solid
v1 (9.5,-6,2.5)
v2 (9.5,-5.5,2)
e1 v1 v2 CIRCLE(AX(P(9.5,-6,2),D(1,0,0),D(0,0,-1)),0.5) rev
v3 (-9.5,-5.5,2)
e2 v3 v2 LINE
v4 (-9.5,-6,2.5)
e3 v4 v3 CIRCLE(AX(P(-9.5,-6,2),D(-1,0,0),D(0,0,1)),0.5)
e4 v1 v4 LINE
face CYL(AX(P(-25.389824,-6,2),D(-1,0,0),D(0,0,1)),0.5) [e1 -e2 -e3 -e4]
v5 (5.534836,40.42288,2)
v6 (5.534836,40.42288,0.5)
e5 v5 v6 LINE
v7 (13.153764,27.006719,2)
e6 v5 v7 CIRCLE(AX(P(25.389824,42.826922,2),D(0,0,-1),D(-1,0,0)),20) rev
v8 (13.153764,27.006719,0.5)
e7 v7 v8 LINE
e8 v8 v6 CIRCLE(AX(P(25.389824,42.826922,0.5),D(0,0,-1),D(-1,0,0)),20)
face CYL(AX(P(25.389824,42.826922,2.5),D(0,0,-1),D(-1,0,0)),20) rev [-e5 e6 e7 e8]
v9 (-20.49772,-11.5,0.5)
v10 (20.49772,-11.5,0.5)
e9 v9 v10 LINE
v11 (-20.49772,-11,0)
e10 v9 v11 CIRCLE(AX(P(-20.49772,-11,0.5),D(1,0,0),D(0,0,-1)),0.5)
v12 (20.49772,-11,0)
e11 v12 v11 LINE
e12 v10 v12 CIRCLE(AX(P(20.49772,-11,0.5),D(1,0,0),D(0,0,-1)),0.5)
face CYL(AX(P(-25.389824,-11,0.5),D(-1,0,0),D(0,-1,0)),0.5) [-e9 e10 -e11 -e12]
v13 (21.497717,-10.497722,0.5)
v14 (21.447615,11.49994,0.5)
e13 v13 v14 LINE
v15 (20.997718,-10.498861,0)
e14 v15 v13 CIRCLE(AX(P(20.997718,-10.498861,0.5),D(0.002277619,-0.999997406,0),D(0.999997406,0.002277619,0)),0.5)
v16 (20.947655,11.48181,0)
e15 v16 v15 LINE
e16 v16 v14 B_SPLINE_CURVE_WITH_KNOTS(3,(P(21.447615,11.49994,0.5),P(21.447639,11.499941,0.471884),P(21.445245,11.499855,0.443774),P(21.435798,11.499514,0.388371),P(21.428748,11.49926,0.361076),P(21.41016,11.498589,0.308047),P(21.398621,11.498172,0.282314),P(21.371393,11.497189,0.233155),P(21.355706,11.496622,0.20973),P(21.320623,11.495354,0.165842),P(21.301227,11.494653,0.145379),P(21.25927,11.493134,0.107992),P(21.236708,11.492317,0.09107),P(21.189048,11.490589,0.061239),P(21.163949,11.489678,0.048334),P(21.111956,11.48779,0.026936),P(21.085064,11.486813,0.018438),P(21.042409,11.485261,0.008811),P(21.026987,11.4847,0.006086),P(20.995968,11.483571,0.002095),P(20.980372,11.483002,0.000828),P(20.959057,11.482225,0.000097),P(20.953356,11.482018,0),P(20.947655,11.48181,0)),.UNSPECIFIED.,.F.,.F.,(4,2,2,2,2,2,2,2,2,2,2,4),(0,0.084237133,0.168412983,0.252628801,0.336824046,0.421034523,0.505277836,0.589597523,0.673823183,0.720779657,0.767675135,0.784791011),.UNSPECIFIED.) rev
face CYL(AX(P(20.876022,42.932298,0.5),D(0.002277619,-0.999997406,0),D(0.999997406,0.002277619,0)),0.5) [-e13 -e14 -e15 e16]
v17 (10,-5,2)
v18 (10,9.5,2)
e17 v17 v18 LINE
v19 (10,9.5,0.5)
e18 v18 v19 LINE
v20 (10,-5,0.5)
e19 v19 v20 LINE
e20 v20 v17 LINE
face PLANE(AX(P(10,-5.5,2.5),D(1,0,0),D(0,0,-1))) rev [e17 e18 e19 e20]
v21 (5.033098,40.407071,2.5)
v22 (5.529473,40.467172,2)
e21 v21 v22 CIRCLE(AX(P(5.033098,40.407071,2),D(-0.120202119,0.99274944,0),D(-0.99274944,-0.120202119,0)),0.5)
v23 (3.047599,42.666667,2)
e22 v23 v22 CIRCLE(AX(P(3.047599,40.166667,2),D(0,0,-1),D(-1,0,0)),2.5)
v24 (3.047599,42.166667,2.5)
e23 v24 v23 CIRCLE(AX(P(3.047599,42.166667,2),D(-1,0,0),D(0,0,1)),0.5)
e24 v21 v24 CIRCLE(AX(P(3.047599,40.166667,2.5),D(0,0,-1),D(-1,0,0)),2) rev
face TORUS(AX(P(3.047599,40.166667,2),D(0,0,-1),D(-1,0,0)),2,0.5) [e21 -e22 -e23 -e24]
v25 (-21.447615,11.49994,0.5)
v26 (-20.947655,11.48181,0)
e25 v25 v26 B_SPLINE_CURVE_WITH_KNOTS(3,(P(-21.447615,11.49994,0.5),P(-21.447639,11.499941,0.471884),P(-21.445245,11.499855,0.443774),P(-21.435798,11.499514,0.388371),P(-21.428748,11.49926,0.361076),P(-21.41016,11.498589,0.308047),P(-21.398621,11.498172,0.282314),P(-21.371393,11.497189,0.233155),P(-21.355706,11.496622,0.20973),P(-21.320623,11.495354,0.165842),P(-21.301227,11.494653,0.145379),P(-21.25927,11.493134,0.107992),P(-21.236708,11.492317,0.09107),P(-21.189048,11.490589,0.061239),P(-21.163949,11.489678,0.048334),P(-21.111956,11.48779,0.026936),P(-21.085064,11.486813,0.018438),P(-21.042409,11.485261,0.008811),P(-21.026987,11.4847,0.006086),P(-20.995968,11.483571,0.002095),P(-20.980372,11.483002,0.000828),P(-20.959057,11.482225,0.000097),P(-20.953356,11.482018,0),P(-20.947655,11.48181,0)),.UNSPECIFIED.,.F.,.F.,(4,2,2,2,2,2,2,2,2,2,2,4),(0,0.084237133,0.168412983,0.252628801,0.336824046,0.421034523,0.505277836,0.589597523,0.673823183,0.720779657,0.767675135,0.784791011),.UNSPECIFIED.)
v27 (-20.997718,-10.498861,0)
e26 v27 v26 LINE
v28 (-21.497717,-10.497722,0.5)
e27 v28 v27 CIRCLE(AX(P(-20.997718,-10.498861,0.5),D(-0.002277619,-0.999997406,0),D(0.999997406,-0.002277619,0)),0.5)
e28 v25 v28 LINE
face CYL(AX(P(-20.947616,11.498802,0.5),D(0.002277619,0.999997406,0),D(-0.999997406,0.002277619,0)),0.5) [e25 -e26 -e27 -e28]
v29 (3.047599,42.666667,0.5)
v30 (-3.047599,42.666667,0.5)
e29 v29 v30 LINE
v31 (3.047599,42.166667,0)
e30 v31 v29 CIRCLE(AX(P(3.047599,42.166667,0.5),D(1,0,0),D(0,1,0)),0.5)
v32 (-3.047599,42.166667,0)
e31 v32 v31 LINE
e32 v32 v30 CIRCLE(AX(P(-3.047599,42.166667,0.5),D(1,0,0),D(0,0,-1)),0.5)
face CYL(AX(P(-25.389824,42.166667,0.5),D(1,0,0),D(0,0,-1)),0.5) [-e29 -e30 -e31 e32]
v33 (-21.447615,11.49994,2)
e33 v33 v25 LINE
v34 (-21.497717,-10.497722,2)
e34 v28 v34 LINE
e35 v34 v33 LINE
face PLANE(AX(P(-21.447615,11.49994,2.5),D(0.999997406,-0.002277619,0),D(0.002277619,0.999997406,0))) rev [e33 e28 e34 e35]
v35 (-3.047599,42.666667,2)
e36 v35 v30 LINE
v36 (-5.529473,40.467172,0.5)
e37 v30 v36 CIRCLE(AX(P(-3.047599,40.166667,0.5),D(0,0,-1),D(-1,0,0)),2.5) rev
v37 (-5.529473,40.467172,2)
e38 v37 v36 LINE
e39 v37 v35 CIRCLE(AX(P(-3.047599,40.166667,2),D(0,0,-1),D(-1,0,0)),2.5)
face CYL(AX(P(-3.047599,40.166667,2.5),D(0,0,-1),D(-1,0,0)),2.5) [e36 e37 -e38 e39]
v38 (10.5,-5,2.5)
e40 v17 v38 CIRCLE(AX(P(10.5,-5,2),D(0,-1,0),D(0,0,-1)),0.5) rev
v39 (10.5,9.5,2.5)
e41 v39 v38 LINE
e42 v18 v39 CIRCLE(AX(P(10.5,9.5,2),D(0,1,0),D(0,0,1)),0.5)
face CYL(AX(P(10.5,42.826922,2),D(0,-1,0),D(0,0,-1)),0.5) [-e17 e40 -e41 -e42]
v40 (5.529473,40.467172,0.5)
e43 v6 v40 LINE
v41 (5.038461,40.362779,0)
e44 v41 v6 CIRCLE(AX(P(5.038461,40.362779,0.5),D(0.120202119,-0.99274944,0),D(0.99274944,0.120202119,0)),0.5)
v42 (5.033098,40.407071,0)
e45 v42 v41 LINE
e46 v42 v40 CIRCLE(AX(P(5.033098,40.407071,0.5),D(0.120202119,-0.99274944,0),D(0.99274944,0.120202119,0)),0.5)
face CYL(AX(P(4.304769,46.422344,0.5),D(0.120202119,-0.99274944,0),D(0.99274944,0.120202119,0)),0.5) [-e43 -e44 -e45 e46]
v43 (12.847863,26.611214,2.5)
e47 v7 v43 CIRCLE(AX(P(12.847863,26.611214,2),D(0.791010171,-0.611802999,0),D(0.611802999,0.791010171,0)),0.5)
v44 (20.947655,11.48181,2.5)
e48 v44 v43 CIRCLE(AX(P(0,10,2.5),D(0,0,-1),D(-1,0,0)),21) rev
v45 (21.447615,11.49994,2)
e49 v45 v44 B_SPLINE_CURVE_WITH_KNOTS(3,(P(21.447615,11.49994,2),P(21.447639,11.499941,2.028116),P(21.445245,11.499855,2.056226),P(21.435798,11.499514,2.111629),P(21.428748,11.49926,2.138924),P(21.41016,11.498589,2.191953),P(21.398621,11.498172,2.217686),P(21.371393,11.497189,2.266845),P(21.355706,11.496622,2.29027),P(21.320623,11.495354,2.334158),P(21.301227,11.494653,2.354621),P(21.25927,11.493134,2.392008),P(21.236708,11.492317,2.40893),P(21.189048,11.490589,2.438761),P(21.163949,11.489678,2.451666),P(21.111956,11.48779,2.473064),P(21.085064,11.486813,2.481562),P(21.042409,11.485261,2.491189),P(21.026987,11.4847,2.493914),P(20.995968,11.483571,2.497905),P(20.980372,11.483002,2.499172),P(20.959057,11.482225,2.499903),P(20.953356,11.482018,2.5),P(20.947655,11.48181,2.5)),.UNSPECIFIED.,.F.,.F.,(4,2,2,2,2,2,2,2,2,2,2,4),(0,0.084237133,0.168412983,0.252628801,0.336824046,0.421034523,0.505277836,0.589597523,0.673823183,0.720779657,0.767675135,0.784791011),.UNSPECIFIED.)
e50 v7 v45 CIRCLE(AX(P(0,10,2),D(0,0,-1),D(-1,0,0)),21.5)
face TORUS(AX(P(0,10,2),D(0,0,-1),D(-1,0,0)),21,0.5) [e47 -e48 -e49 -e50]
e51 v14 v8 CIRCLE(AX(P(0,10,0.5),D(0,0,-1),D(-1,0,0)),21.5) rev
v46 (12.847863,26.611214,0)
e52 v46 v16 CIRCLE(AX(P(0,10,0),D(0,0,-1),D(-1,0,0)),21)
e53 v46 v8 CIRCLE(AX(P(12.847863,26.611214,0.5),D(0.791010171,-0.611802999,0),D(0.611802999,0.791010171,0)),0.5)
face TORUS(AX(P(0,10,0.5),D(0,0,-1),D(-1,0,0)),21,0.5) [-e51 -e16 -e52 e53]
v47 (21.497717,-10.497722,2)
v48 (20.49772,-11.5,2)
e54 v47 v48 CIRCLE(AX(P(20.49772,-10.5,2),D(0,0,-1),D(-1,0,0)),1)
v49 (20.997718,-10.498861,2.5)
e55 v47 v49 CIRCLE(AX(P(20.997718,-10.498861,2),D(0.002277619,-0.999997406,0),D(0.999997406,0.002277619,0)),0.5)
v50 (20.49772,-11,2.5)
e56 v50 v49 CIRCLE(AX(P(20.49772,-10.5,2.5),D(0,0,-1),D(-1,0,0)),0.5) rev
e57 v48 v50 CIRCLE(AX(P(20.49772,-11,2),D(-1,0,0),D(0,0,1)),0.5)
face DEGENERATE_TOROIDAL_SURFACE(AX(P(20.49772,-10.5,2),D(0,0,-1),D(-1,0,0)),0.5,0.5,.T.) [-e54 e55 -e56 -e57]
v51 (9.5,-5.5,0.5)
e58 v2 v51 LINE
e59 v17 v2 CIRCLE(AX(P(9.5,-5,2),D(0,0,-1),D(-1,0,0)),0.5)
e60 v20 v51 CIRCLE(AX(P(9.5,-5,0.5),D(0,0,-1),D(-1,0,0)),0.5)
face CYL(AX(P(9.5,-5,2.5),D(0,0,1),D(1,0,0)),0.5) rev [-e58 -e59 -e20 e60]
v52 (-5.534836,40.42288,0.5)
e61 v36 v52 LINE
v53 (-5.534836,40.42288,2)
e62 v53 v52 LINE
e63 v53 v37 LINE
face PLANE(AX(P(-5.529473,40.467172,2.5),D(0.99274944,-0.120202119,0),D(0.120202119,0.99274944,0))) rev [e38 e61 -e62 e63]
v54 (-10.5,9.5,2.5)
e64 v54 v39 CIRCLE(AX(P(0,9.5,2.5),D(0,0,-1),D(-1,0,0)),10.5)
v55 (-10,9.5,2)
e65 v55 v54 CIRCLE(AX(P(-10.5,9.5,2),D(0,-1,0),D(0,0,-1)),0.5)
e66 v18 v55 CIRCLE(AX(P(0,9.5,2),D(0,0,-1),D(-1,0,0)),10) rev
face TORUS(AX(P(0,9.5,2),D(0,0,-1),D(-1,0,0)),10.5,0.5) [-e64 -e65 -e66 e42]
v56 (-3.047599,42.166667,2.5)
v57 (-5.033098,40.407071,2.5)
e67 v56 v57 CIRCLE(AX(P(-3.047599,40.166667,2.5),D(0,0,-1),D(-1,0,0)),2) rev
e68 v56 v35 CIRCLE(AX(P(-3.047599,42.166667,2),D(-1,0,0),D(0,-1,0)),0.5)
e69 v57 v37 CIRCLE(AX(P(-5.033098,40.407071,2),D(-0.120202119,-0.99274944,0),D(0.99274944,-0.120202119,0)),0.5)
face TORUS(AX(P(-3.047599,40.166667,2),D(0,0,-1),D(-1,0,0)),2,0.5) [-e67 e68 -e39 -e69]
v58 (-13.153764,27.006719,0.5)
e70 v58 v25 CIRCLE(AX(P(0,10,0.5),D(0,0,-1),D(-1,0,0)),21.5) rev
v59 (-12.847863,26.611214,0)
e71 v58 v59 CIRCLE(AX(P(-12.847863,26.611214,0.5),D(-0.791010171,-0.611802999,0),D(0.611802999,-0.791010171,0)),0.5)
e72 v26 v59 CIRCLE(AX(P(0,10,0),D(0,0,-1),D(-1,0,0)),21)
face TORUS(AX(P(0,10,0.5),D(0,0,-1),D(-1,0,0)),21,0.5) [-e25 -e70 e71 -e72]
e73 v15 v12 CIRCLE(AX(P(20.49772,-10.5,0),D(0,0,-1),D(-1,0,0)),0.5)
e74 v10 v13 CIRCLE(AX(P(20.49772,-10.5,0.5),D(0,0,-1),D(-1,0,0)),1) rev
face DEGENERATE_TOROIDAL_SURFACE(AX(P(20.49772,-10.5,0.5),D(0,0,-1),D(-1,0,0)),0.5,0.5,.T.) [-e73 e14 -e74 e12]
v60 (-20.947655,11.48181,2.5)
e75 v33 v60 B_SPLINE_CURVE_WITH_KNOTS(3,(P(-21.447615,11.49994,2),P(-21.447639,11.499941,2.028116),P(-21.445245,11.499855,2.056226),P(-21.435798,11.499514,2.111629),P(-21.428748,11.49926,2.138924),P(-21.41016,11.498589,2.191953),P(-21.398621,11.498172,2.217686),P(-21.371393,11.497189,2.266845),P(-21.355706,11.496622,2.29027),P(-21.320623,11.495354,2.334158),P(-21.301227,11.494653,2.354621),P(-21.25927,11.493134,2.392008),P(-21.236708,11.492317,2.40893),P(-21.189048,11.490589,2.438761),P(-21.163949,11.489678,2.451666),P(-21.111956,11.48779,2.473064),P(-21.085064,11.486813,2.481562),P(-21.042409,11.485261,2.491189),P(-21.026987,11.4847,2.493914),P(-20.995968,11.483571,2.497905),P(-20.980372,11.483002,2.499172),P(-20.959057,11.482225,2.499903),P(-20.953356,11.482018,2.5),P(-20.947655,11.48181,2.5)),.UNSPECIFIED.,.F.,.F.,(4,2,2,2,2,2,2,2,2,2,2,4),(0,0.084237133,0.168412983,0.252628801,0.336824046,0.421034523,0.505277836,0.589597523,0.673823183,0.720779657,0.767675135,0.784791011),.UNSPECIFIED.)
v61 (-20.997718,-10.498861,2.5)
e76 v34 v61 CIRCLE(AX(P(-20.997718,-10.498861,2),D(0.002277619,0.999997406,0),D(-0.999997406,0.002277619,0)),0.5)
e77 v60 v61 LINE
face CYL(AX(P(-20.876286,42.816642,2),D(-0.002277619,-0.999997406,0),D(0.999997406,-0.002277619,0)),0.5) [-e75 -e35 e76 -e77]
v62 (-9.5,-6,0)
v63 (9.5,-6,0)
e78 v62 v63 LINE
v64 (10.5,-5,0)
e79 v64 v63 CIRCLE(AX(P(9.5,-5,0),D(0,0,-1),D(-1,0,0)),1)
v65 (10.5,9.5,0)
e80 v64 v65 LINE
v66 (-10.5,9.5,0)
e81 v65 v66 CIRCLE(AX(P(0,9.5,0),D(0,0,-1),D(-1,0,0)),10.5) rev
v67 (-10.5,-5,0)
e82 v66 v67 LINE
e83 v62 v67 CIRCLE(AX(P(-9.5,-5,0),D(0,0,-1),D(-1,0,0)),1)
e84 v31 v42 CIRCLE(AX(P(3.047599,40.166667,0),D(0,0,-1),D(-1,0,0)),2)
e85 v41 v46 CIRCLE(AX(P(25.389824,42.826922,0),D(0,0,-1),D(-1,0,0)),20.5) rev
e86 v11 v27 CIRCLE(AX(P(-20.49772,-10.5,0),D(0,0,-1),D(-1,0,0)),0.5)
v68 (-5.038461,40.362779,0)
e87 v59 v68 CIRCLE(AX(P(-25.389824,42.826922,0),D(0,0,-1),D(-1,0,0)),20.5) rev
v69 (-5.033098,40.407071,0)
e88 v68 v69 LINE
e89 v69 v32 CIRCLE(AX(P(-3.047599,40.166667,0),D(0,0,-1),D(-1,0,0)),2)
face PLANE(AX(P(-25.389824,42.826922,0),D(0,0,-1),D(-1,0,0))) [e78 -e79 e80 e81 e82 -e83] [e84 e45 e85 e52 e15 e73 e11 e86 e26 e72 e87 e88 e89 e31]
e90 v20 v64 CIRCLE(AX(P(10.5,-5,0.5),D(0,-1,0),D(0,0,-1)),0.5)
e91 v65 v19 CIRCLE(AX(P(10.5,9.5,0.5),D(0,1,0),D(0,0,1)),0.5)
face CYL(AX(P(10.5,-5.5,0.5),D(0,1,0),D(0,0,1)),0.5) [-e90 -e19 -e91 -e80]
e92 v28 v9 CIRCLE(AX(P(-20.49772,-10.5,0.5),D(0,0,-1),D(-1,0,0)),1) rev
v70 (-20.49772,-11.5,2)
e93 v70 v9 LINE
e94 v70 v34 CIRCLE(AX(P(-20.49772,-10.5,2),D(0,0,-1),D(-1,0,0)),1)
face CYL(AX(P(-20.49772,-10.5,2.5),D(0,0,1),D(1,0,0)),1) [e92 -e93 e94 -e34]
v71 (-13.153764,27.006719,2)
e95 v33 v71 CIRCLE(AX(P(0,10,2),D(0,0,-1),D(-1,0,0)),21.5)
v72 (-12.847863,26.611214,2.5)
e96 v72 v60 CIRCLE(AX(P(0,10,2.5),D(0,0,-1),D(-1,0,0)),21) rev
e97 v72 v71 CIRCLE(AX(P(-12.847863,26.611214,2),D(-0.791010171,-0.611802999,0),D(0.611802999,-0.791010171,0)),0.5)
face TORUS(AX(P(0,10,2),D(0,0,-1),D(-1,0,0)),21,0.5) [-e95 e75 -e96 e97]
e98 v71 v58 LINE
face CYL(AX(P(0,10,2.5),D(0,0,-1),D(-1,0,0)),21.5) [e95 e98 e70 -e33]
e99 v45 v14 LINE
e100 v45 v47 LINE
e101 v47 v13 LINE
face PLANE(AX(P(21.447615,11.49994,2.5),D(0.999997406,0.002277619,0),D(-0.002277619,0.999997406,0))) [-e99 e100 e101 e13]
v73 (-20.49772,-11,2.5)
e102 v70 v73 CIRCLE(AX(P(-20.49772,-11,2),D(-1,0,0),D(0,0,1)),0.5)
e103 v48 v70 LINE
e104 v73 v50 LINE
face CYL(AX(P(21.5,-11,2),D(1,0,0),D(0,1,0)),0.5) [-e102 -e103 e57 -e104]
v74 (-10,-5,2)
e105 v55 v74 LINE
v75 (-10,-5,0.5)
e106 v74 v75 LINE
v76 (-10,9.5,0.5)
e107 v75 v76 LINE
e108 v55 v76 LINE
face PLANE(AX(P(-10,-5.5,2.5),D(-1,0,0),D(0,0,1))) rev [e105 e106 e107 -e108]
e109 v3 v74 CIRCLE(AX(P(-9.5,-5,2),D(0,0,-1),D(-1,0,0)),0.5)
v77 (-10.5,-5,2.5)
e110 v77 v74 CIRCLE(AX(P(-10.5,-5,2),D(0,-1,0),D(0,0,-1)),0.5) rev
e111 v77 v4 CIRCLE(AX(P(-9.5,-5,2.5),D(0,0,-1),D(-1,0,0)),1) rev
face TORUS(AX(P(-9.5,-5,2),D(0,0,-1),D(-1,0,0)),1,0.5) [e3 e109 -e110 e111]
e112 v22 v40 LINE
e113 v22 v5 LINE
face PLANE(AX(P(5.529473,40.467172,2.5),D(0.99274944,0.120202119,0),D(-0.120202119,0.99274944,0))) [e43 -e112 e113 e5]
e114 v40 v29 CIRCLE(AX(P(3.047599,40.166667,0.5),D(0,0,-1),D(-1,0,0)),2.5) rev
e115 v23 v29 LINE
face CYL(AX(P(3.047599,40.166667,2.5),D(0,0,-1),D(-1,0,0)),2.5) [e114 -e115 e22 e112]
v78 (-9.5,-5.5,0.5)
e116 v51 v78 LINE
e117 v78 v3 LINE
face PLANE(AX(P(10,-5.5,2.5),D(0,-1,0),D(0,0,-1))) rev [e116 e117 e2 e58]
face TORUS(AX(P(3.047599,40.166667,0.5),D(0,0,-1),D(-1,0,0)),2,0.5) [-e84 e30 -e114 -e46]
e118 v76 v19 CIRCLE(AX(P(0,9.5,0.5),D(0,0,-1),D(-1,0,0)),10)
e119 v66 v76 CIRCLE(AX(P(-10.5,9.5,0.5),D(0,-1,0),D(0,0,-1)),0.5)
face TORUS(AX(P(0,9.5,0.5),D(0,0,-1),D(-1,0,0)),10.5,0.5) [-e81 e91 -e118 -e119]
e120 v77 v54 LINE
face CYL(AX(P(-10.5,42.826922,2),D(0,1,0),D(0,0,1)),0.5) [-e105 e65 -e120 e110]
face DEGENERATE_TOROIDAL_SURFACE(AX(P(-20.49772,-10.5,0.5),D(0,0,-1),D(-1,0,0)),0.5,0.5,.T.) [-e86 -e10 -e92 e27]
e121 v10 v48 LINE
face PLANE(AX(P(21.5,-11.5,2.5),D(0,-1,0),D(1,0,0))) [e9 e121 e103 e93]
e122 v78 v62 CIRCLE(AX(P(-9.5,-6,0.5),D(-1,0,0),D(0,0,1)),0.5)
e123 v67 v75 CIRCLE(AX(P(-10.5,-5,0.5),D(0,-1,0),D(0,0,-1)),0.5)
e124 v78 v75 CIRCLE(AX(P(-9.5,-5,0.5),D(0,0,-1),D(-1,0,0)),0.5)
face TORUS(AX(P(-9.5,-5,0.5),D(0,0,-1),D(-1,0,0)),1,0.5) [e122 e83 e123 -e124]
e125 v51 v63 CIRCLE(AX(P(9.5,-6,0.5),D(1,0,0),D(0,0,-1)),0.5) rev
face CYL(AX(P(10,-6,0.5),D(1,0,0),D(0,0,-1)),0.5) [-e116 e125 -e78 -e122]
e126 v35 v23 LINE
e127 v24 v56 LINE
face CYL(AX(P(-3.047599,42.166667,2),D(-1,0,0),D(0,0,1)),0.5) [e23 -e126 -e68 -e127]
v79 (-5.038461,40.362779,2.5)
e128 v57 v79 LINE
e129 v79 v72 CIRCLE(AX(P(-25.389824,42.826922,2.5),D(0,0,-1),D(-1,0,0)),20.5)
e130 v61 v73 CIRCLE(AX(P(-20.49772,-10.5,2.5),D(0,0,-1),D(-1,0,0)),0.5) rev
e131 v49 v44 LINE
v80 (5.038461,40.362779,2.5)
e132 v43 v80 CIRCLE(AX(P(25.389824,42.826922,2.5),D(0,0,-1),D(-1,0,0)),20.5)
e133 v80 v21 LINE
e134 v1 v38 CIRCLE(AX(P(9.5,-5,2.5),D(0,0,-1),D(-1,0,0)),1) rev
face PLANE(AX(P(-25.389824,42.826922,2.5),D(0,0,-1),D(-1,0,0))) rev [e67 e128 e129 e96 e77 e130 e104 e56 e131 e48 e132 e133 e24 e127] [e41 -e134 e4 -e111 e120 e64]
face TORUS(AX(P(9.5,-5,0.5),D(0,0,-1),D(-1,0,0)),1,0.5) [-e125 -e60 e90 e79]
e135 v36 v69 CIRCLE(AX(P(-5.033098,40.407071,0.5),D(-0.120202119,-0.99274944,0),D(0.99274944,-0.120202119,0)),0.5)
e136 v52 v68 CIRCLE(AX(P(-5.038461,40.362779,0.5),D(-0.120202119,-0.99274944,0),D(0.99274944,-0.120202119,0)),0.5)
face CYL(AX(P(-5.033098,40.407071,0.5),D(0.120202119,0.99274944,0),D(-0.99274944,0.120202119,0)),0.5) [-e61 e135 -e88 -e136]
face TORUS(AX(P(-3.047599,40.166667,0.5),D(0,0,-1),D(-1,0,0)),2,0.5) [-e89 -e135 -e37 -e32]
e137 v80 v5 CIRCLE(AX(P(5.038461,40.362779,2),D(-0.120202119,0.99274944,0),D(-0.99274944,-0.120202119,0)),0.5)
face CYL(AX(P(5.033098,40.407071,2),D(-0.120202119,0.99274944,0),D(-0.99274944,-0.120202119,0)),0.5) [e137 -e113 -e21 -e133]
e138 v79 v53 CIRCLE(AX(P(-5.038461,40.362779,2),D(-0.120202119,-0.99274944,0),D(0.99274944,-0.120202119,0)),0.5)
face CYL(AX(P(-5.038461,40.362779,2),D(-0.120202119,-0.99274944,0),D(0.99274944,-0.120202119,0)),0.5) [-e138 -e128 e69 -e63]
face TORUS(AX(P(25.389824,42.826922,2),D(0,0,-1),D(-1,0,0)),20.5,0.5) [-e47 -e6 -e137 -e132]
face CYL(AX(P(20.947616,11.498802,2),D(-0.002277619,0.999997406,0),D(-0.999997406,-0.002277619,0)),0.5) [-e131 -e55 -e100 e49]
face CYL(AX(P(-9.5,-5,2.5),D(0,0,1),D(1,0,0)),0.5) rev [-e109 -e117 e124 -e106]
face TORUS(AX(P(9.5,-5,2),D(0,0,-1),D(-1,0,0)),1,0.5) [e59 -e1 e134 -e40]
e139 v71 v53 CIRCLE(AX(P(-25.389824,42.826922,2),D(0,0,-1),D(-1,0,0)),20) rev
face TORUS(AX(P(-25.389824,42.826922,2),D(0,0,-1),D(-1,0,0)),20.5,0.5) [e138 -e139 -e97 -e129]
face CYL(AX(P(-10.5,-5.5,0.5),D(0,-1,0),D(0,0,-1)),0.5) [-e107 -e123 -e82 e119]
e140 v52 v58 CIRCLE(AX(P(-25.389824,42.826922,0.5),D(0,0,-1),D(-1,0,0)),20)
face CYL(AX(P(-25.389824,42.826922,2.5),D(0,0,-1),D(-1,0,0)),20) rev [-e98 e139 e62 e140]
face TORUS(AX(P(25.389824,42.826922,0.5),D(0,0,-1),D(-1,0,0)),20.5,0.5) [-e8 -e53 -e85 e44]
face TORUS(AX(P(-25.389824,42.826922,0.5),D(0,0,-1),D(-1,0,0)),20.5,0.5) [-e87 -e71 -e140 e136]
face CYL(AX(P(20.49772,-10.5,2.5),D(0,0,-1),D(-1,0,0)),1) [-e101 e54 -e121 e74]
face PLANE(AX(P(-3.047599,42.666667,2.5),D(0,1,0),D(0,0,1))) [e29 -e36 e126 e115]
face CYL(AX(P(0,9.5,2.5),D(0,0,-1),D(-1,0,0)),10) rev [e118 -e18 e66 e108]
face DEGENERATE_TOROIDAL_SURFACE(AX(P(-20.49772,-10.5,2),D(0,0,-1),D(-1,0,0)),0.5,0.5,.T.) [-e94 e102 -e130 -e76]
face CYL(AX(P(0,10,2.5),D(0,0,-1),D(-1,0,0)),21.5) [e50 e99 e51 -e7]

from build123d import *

# Parameters (mm, degrees)
BOSS_EXTRUDE1_DEPTH = 2.5
FILLET1_R           = 1
FILLET2_R           = 0.5
FILLET3_R           = 0.5
CUT_EXTRUDE2_DEPTH  = 2.5
FILLET4_R           = 0.5


with BuildPart() as part:
    # Sketch2 → Boss-Extrude1 (new body)
    with BuildSketch(Plane.XY):
        with BuildLine():
            Line((-21.447614762, 11.499940343), (-21.5, -11.5))
            Line((-21.5, -11.5), (21.5, -11.5))
            Line((21.5, -11.5), (21.447614762, 11.499940343))
            ThreePointArc((21.447614762, 11.499940343), (18.95861031, 20.140073724), (13.153764478, 27.006718674))
            ThreePointArc((13.153764478, 27.006718674), (7.998527865, 32.950546095), (5.534835658, 40.422879711))
            Line((5.534835658, 40.422879711), (5.529472751, 40.467171964))
            ThreePointArc((5.529472751, 40.467171964), (4.705721094, 42.037664161), (3.047599151, 42.666666667))
            Line((3.047599151, 42.666666667), (-3.047599151, 42.666666667))
            ThreePointArc((-3.047599151, 42.666666667), (-4.705721094, 42.037664161), (-5.529472751, 40.467171964))
            Line((-5.529472751, 40.467171964), (-5.534835658, 40.422879711))
            ThreePointArc((-5.534835658, 40.422879711), (-7.998527865, 32.950546095), (-13.153764478, 27.006718674))
            ThreePointArc((-13.153764478, 27.006718674), (-18.95861031, 20.140073724), (-21.447614762, 11.499940343))
        make_face()
    extrude(amount=BOSS_EXTRUDE1_DEPTH)

    # Fillet1
    fillet1_edges = [part.edges().sort_by_distance(p)[0] for p in [
        (21.5, -11.5, 1.25),
        (-21.5, -11.5, 1.25),
    ]]
    fillet(fillet1_edges, radius=FILLET1_R)

    # Fillet2
    # the kernel refuses this fillet: 0.5 mm, written as the material it takes off along each edge
    with BuildSketch(Plane(origin=(0, 10, 2.5), x_dir=(-0.6118029989647665, 0.7910101708939764, 0), z_dir=(0.7910101708939764, 0.6118029989647665, 0))) as fillet2_piece_1:
        with BuildLine():
            CenterArc((21.5 - FILLET2_R, -FILLET2_R), FILLET2_R, 0, 90)
            Line((21.5 - FILLET2_R, 0), (21.5, 0))
            Line((21.5, 0), (21.5, -FILLET2_R))
        make_face()
    revolve(axis=Axis((0, 10, 2.5), (0, 0, 1)), revolution_arc=51.611078363, mode=Mode.SUBTRACT)
    with BuildSketch(Plane(origin=(-21.444767738, 12.749937101, 2.5), x_dir=(0, 0, -1), z_dir=(-0.0022776190557038953, -0.9999974062223548, 0))) as fillet2_piece_2:
        with BuildLine():
            CenterArc((FILLET2_R, FILLET2_R), FILLET2_R, 180, 90)
            Line((0, FILLET2_R), (0, 0))
            Line((0, 0), (FILLET2_R, 0))
        make_face()
    extrude(amount=23.247719781, mode=Mode.SUBTRACT)
    with BuildSketch(Plane(origin=(21.497717187, -10.497722381, 2.5), x_dir=(-0.9999974062223547, -0.002277619055703895, 0), z_dir=(-0.0022776190557038953, 0.9999974062223548, 0))) as fillet2_piece_3:
        with BuildLine():
            CenterArc((FILLET2_R, -FILLET2_R), FILLET2_R, 90, 90)
            Line((0, -FILLET2_R), (0, 0))
            Line((0, 0), (FILLET2_R, 0))
        make_face()
    extrude(amount=23.247719781, mode=Mode.SUBTRACT)
    with BuildSketch(Plane(origin=(0, 10, 2.5), x_dir=(0.999931846454531, 0.011674863854978535, 0), z_dir=(0.011674863854978535, -0.999931846454531, 0))) as fillet2_piece_4:
        with BuildLine():
            CenterArc((21.5 - FILLET2_R, -FILLET2_R), FILLET2_R, 0, 90)
            Line((21.5, -FILLET2_R), (21.5, 0))
            Line((21.5, 0), (21.5 - FILLET2_R, 0))
        make_face()
    revolve(axis=Axis((0, 10, 2.5), (0, 0, 1)), revolution_arc=51.611078363, mode=Mode.SUBTRACT)
    with BuildSketch(Plane(origin=(25.389824457, 42.826922092, 2.5), x_dir=(-0.6118029989647666, -0.7910101708939764, 0), z_dir=(0.7910101708939764, -0.6118029989647666, 0))) as fillet2_piece_5:
        with BuildLine():
            CenterArc((20 + FILLET2_R, FILLET2_R), FILLET2_R, 180, 90)
            Line((20, FILLET2_R), (20, 0))
            Line((20, 0), (20 + FILLET2_R, 0))
        make_face()
    revolve(axis=Axis((25.389824457, 42.826922092, 2.5), (0, 0, -1)), revolution_arc=45.3762464, mode=Mode.SUBTRACT)
    with BuildSketch(Plane(origin=(-20.497719781, -11.5, 2.5), x_dir=(0, 1, 0), z_dir=(1, 0, 0))) as fillet2_piece_6:
        with BuildLine():
            CenterArc((FILLET2_R, -FILLET2_R), FILLET2_R, 90, 90)
            Line((0, -FILLET2_R), (0, 0))
            Line((0, 0), (FILLET2_R, 0))
        make_face()
    extrude(amount=40.995439563, mode=Mode.SUBTRACT)
    with BuildSketch(Plane(origin=(5.534835658, 40.422879711, 2.5), x_dir=(-0.9927494399740624, -0.12020211907943115, 0), z_dir=(-0.12020211907943114, 0.9927494399740623, 0)), Plane(origin=(-5.529472751, 40.467171964, 2.5), x_dir=(0.9927494399740623, -0.1202021190794305, 0), z_dir=(-0.12020211907943051, -0.9927494399740624, 0))) as fillet2_piece_7:
        with BuildLine():
            CenterArc((FILLET2_R, -FILLET2_R), FILLET2_R, 90, 90)
            Line((0, -FILLET2_R), (0, 0))
            Line((0, 0), (FILLET2_R, 0))
        make_face()
    extrude(amount=0.044615743, mode=Mode.SUBTRACT)
    with BuildSketch(Plane(origin=(20.497719781, -10.5, 2.5), x_dir=(0, -1, 0), z_dir=(-1, 0, 0))) as fillet2_piece_8:
        with BuildLine():
            CenterArc((1 - FILLET2_R, -FILLET2_R), FILLET2_R, 0, 90)
            Line((1, -FILLET2_R), (1, 0))
            Line((1, 0), (1 - FILLET2_R, 0))
        make_face()
    revolve(axis=Axis((20.497719781, -10.5, 2.5), (0, 0, 1)), revolution_arc=90.130498072, mode=Mode.SUBTRACT)
    with BuildSketch(Plane(origin=(3.047599151, 40.166666667, 2.5), x_dir=(0.9927494399740617, 0.12020211907943634, 0), z_dir=(0.12020211907943634, -0.9927494399740617, 0))) as fillet2_piece_9:
        with BuildLine():
            CenterArc((2.5 - FILLET2_R, -FILLET2_R), FILLET2_R, 0, 90)
            Line((2.5, -FILLET2_R), (2.5, 0))
            Line((2.5, 0), (2.5 - FILLET2_R, 0))
        make_face()
    revolve(axis=Axis((3.047599151, 40.166666667, 2.5), (0, 0, 1)), revolution_arc=83.096232415, mode=Mode.SUBTRACT)
    with BuildSketch(Plane(origin=(-20.497719781, -10.5, 2.5), x_dir=(-0.9999974062223547, 0.002277619055705668, 0), z_dir=(0.002277619055705668, 0.9999974062223547, 0))) as fillet2_piece_10:
        with BuildLine():
            CenterArc((1 - FILLET2_R, -FILLET2_R), FILLET2_R, 0, 90)
            Line((1 - FILLET2_R, 0), (1, 0))
            Line((1, 0), (1, -FILLET2_R))
        make_face()
    revolve(axis=Axis((-20.497719781, -10.5, 2.5), (0, 0, 1)), revolution_arc=90.130498072, mode=Mode.SUBTRACT)
    with BuildSketch(Plane(origin=(3.047599151, 42.666666667, 2.5), x_dir=(0, -1, 0), z_dir=(-1, 0, 0))) as fillet2_piece_11:
        with BuildLine():
            CenterArc((FILLET2_R, -FILLET2_R), FILLET2_R, 90, 90)
            Line((0, -FILLET2_R), (0, 0))
            Line((0, 0), (FILLET2_R, 0))
        make_face()
    extrude(amount=6.095198302, mode=Mode.SUBTRACT)
    with BuildSketch(Plane(origin=(-3.047599151, 40.166666667, 2.5), x_dir=(0, 1, 0), z_dir=(1, 0, 0))) as fillet2_piece_12:
        with BuildLine():
            CenterArc((2.5 - FILLET2_R, -FILLET2_R), FILLET2_R, 0, 90)
            Line((2.5, -FILLET2_R), (2.5, 0))
            Line((2.5, 0), (2.5 - FILLET2_R, 0))
        make_face()
    revolve(axis=Axis((-3.047599151, 40.166666667, 2.5), (0, 0, 1)), revolution_arc=83.096232415, mode=Mode.SUBTRACT)
    with BuildSketch(Plane(origin=(-25.389824457, 42.826922092, 2.5), x_dir=(0.9927494399740615, -0.12020211907943686, 0), z_dir=(0.12020211907943686, 0.9927494399740615, 0))) as fillet2_piece_13:
        with BuildLine():
            CenterArc((20 + FILLET2_R, FILLET2_R), FILLET2_R, 180, 90)
            Line((20, FILLET2_R), (20, 0))
            Line((20, 0), (20 + FILLET2_R, 0))
        make_face()
    revolve(axis=Axis((-25.389824457, 42.826922092, 2.5), (0, 0, -1)), revolution_arc=45.3762464, mode=Mode.SUBTRACT)

    # Fillet3
    # the kernel refuses this fillet: 0.5 mm, written as the material it takes off along each edge
    with BuildSketch(Plane(origin=(-3.047599151, 40.166666667, 0), x_dir=(0, 1, 0), z_dir=(1, 0, 0))) as fillet3_piece_1:
        with BuildLine():
            CenterArc((2.5 - FILLET3_R, FILLET3_R), FILLET3_R, 270, 90)
            Line((2.5, FILLET3_R), (2.5, 0))
            Line((2.5, 0), (2.5 - FILLET3_R, 0))
        make_face()
    revolve(axis=Axis((-3.047599151, 40.166666667, 0), (0, 0, 1)), revolution_arc=83.096232415, mode=Mode.SUBTRACT)
    with BuildSketch(Plane(origin=(3.047599151, 42.666666667, 0), x_dir=(0, -1, 0), z_dir=(-1, 0, 0))) as fillet3_piece_2:
        with BuildLine():
            CenterArc((FILLET3_R, FILLET3_R), FILLET3_R, 180, 90)
            Line((0, FILLET3_R), (0, 0))
            Line((0, 0), (FILLET3_R, 0))
        make_face()
    extrude(amount=6.095198302, mode=Mode.SUBTRACT)
    with BuildSketch(Plane(origin=(3.047599151, 40.166666667, 0), x_dir=(0.9927494399740617, 0.12020211907943634, 0), z_dir=(0.12020211907943634, -0.9927494399740617, 0))) as fillet3_piece_3:
        with BuildLine():
            CenterArc((2.5 - FILLET3_R, FILLET3_R), FILLET3_R, 270, 90)
            Line((2.5, FILLET3_R), (2.5, 0))
            Line((2.5, 0), (2.5 - FILLET3_R, 0))
        make_face()
    revolve(axis=Axis((3.047599151, 40.166666667, 0), (0, 0, 1)), revolution_arc=83.096232415, mode=Mode.SUBTRACT)
    with BuildSketch(Plane(origin=(5.534835658, 40.422879711, 0), x_dir=(-0.9927494399740624, -0.12020211907943115, 0), z_dir=(-0.12020211907943114, 0.9927494399740623, 0)), Plane(origin=(-5.529472751, 40.467171964, 0), x_dir=(0.9927494399740623, -0.1202021190794305, 0), z_dir=(-0.12020211907943051, -0.9927494399740624, 0))) as fillet3_piece_4:
        with BuildLine():
            CenterArc((FILLET3_R, FILLET3_R), FILLET3_R, 180, 90)
            Line((0, FILLET3_R), (0, 0))
            Line((0, 0), (FILLET3_R, 0))
        make_face()
    extrude(amount=0.044615743, mode=Mode.SUBTRACT)
    with BuildSketch(Plane(origin=(25.389824457, 42.826922092, 0), x_dir=(-0.6118029989647666, -0.7910101708939764, 0), z_dir=(0.7910101708939764, -0.6118029989647666, 0))) as fillet3_piece_5:
        with BuildLine():
            CenterArc((20 + FILLET3_R, -FILLET3_R), FILLET3_R, 90, 90)
            Line((20, -FILLET3_R), (20, 0))
            Line((20, 0), (20 + FILLET3_R, 0))
        make_face()
    revolve(axis=Axis((25.389824457, 42.826922092, 0), (0, 0, -1)), revolution_arc=45.3762464, mode=Mode.SUBTRACT)
    with BuildSketch(Plane(origin=(0, 10, 0), x_dir=(0.999931846454531, 0.011674863854978535, 0), z_dir=(0.011674863854978535, -0.999931846454531, 0))) as fillet3_piece_6:
        with BuildLine():
            CenterArc((21.5 - FILLET3_R, FILLET3_R), FILLET3_R, 270, 90)
            Line((21.5, FILLET3_R), (21.5, 0))
            Line((21.5, 0), (21.5 - FILLET3_R, 0))
        make_face()
    revolve(axis=Axis((0, 10, 0), (0, 0, 1)), revolution_arc=51.611078363, mode=Mode.SUBTRACT)
    with BuildSketch(Plane(origin=(21.497717187, -10.497722381, 0), x_dir=(-0.9999974062223547, -0.002277619055703895, 0), z_dir=(-0.0022776190557038953, 0.9999974062223548, 0))) as fillet3_piece_7:
        with BuildLine():
            CenterArc((FILLET3_R, FILLET3_R), FILLET3_R, 180, 90)
            Line((0, FILLET3_R), (0, 0))
            Line((0, 0), (FILLET3_R, 0))
        make_face()
    extrude(amount=23.247719781, mode=Mode.SUBTRACT)
    with BuildSketch(Plane(origin=(-21.444767738, 12.749937101, 0), x_dir=(0, 0, 1), z_dir=(-0.0022776190557038953, -0.9999974062223548, 0))) as fillet3_piece_8:
        with BuildLine():
            CenterArc((FILLET3_R, -FILLET3_R), FILLET3_R, 90, 90)
            Line((0, -FILLET3_R), (0, 0))
            Line((0, 0), (FILLET3_R, 0))
        make_face()
    extrude(amount=23.247719781, mode=Mode.SUBTRACT)
    with BuildSketch(Plane(origin=(0, 10, 0), x_dir=(-0.6118029989647665, 0.7910101708939764, 0), z_dir=(0.7910101708939764, 0.6118029989647665, 0))) as fillet3_piece_9:
        with BuildLine():
            CenterArc((21.5 - FILLET3_R, FILLET3_R), FILLET3_R, 270, 90)
            Line((21.5 - FILLET3_R, 0), (21.5, 0))
            Line((21.5, 0), (21.5, FILLET3_R))
        make_face()
    revolve(axis=Axis((0, 10, 0), (0, 0, 1)), revolution_arc=51.611078363, mode=Mode.SUBTRACT)
    with BuildSketch(Plane(origin=(-25.389824457, 42.826922092, 0), x_dir=(0.9927494399740615, -0.12020211907943686, 0), z_dir=(0.12020211907943686, 0.9927494399740615, 0))) as fillet3_piece_10:
        with BuildLine():
            CenterArc((20 + FILLET3_R, -FILLET3_R), FILLET3_R, 90, 90)
            Line((20, -FILLET3_R), (20, 0))
            Line((20, 0), (20 + FILLET3_R, 0))
        make_face()
    revolve(axis=Axis((-25.389824457, 42.826922092, 0), (0, 0, -1)), revolution_arc=45.3762464, mode=Mode.SUBTRACT)
    with BuildSketch(Plane(origin=(-20.497719781, -11.5, 0), x_dir=(0, 1, 0), z_dir=(1, 0, 0))) as fillet3_piece_11:
        with BuildLine():
            CenterArc((FILLET3_R, FILLET3_R), FILLET3_R, 180, 90)
            Line((0, FILLET3_R), (0, 0))
            Line((0, 0), (FILLET3_R, 0))
        make_face()
    extrude(amount=40.995439563, mode=Mode.SUBTRACT)
    with BuildSketch(Plane(origin=(20.497719781, -10.5, 0), x_dir=(0, -1, 0), z_dir=(-1, 0, 0))) as fillet3_piece_12:
        with BuildLine():
            CenterArc((1 - FILLET3_R, FILLET3_R), FILLET3_R, 270, 90)
            Line((1, FILLET3_R), (1, 0))
            Line((1, 0), (1 - FILLET3_R, 0))
        make_face()
    revolve(axis=Axis((20.497719781, -10.5, 0), (0, 0, 1)), revolution_arc=90.130498072, mode=Mode.SUBTRACT)
    with BuildSketch(Plane(origin=(-20.497719781, -10.5, 0), x_dir=(-0.9999974062223547, 0.002277619055705668, 0), z_dir=(0.002277619055705668, 0.9999974062223547, 0))) as fillet3_piece_13:
        with BuildLine():
            CenterArc((1 - FILLET3_R, FILLET3_R), FILLET3_R, 270, 90)
            Line((1 - FILLET3_R, 0), (1, 0))
            Line((1, 0), (1, FILLET3_R))
        make_face()
    revolve(axis=Axis((-20.497719781, -10.5, 0), (0, 0, 1)), revolution_arc=90.130498072, mode=Mode.SUBTRACT)

    # Sketch4 → Cut-Extrude2 (cut)
    with BuildSketch(Plane(origin=(0, 0, 0), x_dir=(-1, 0, 0), z_dir=(0, 0, -1))):
        with BuildLine():
            Line((-10, -5.5), (10, -5.5))
            Line((10, -5.5), (10, 9.5))
            ThreePointArc((10, 9.5), (0, 19.5), (-10, 9.5))
            Line((-10, 9.5), (-10, -5.5))
        make_face()
    extrude(amount=-CUT_EXTRUDE2_DEPTH, mode=Mode.SUBTRACT)

    # Fillet4
    fillet4_edges = [part.edges().sort_by_distance(p)[0] for p in [
        (0, 19.5, 2.5),
        (-10, 2, 2.5),
        (0, -5.5, 2.5),
        (-10, -5.5, 1.25),
        (10, 2, 2.5),
        (10, -5.5, 1.25),
        (0, 19.5, 0),
        (10, 2, 0),
        (0, -5.5, 0),
        (-10, 2, 0),
    ]]
    fillet(fillet4_edges, radius=FILLET4_R)


solid = part.part
